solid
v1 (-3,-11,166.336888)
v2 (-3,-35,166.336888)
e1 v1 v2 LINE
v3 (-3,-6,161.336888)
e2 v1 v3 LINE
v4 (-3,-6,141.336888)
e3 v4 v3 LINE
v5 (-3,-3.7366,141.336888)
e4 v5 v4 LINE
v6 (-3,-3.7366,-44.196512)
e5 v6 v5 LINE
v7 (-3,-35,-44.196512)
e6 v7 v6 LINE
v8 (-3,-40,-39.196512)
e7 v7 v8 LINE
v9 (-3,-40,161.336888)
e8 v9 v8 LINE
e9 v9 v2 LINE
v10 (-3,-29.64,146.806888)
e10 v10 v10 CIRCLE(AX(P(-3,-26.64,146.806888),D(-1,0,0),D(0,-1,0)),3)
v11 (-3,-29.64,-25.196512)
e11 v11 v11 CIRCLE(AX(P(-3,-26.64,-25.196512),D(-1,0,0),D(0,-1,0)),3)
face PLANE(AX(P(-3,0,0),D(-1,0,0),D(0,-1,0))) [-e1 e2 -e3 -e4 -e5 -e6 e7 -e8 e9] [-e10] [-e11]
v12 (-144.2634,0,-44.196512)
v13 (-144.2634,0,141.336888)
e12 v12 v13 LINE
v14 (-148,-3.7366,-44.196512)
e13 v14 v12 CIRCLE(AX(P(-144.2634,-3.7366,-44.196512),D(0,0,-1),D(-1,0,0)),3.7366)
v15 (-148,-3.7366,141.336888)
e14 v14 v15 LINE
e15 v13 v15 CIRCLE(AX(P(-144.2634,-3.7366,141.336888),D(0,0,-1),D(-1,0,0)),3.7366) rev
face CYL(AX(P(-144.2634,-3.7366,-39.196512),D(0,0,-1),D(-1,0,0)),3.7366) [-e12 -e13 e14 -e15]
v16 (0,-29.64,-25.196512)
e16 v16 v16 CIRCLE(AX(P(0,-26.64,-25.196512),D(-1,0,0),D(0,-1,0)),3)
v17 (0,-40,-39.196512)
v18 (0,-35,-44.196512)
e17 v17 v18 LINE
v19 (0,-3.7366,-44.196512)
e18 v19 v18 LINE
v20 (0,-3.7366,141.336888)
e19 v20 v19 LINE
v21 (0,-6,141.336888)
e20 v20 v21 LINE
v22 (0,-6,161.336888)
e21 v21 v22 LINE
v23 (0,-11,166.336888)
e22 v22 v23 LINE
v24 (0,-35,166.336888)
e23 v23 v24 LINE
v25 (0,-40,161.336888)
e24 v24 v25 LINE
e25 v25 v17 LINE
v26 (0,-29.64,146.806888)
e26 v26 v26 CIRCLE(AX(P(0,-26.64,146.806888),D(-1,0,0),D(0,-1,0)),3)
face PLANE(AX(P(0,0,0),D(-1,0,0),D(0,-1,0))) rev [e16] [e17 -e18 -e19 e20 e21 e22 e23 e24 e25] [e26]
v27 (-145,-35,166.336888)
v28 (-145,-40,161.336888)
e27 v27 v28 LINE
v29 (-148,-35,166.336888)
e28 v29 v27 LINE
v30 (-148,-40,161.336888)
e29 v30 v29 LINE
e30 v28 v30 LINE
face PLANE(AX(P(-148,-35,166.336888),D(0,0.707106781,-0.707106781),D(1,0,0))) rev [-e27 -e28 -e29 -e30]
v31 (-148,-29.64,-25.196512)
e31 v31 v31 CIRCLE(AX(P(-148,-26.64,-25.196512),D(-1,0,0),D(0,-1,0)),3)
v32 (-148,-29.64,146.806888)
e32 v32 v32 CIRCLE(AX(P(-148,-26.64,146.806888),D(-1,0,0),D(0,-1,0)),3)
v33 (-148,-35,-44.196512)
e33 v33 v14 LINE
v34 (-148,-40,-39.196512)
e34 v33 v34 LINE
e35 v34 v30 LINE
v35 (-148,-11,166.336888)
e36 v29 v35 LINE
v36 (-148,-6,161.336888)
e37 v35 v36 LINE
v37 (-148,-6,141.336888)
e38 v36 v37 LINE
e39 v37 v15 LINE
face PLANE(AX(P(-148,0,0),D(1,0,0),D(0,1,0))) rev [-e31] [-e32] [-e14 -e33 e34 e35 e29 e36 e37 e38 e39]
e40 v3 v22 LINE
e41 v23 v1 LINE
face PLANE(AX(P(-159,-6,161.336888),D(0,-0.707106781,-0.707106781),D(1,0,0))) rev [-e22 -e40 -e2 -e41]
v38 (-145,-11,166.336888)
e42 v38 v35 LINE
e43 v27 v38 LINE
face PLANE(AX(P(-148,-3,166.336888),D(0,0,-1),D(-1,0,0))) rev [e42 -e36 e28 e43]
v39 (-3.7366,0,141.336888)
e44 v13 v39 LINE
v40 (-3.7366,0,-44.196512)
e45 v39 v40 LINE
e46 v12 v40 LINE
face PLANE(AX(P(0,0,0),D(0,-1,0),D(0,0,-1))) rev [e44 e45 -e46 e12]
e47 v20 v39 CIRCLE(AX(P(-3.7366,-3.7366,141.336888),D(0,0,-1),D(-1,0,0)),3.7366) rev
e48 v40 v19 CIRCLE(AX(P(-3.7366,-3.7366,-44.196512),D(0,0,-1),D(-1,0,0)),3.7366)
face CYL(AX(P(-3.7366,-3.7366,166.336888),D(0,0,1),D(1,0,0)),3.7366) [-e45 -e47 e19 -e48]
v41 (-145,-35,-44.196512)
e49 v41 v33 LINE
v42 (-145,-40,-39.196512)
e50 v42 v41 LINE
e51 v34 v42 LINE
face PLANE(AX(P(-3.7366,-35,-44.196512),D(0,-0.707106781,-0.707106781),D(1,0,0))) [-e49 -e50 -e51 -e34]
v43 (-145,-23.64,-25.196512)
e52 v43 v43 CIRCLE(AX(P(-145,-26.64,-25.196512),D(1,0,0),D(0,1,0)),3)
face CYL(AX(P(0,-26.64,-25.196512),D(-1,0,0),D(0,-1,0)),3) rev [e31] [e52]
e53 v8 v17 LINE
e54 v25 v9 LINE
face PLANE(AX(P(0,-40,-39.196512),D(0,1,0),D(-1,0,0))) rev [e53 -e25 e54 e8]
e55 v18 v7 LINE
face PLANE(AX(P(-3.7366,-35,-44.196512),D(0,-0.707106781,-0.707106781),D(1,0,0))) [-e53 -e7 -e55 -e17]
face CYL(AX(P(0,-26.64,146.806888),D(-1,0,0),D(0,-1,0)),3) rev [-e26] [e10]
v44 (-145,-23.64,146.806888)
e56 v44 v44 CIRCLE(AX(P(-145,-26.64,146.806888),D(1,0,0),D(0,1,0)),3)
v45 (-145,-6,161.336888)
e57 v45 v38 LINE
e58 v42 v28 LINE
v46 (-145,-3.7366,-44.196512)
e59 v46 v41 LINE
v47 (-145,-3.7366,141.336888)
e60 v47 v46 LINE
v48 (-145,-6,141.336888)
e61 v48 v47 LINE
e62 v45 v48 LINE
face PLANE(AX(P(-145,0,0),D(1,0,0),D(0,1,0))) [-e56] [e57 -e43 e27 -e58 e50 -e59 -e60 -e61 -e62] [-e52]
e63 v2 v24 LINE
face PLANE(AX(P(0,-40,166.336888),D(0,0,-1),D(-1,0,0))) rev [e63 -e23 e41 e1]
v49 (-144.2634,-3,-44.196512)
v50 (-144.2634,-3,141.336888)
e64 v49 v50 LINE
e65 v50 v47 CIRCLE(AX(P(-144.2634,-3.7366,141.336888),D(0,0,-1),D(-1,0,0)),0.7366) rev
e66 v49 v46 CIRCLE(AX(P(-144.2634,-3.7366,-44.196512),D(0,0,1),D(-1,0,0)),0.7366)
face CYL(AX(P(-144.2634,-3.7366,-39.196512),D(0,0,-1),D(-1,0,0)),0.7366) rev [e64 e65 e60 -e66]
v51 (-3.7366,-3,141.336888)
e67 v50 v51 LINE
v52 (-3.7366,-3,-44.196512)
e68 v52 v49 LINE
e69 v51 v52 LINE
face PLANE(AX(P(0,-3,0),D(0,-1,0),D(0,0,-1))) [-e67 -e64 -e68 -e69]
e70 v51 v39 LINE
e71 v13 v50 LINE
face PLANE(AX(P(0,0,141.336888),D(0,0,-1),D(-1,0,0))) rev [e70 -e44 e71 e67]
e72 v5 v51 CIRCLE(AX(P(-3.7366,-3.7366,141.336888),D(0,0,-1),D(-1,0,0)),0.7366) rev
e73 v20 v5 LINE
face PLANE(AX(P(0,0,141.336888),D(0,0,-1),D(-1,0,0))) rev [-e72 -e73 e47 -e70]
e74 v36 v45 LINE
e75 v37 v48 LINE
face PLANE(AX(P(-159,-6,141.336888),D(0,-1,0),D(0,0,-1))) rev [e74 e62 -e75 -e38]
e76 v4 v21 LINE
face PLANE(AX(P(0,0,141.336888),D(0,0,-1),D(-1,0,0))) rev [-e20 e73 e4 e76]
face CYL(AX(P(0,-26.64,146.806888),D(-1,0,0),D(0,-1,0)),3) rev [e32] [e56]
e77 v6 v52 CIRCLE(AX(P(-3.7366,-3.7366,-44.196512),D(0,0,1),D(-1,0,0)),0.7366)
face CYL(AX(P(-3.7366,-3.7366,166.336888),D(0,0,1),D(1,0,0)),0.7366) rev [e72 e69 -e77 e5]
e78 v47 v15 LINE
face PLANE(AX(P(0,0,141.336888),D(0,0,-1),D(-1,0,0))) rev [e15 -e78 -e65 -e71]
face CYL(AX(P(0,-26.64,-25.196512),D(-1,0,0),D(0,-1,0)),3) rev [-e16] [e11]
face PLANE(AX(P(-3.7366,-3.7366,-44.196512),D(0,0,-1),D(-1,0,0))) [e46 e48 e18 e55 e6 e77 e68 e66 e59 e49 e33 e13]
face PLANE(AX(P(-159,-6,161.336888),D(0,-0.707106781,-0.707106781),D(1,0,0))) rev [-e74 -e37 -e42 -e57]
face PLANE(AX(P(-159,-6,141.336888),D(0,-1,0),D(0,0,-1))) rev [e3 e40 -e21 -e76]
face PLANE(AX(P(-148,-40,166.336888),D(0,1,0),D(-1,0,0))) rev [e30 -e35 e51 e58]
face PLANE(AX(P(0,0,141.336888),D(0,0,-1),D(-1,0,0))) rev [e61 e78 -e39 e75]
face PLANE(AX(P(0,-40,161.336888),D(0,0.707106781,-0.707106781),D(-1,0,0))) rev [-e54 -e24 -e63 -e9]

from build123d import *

# Parameters (mm, degrees)
SKETCH18_W                     = 148
SKETCH18_H                     = 205.5334
BASE_FLANGE1_DEPTH             = 3
EDGE_FLANGE1_STRIP_W           = 13.4732
EDGE_FLANGE1_STRIP_H           = 3
EDGE_FLANGE1_STRIP_CUT_DEPTH   = 205.5334
EDGE_FLANGE1_STRIP_2_W         = 13.4732
EDGE_FLANGE1_STRIP_2_H         = 3
EDGE_FLANGE1_STRIP_CUT_2_DEPTH = 205.5334
EDGE_FLANGE1_DEPTH             = 205.5334
EDGE_FLANGE1_BEND_DEPTH        = 205.5334
SKETCH27_R                     = 3
CUT_EXTRUDE1_DEPTH             = 227.212201998
SKETCH28_W                     = 160
SKETCH28_H                     = 8
CUT_EXTRUDE2_DEPTH             = 25
BOSS_EXTRUDE1_DEPTH            = 5
CHAMFER2_SIZE                  = 5


# Sheet-metal steps are written as plain solids
with BuildPart() as part:
    # Sketch18 → Base-Flange1 (new body)
    with BuildSketch(Plane(origin=(0, 0, 0), x_dir=(1, 0, 0), z_dir=(0, 1, 0))):
        with Locations((-74, -63.57018807)):
            Rectangle(SKETCH18_W, SKETCH18_H)
    extrude(amount=-BASE_FLANGE1_DEPTH)

    # Edge-Flange1 strip (across the edge) → Edge-Flange1 strip cut (cut)
    with BuildSketch(Plane(origin=(0, -3, -39.19651193), x_dir=(-1, 0, 0), z_dir=(0, 0, 1))):
        with Locations((-3, -1.5)):
            Rectangle(EDGE_FLANGE1_STRIP_W, EDGE_FLANGE1_STRIP_H)
    extrude(amount=EDGE_FLANGE1_STRIP_CUT_DEPTH, mode=Mode.SUBTRACT)

    # Edge-Flange1 strip 2 (across the edge) → Edge-Flange1 strip cut 2 (cut)
    with BuildSketch(Plane(origin=(-148, -3, 166.33688807), x_dir=(1, 0, 0), z_dir=(0, 0, -1))):
        with Locations((-3, -1.5)):
            Rectangle(EDGE_FLANGE1_STRIP_2_W, EDGE_FLANGE1_STRIP_2_H)
    extrude(amount=EDGE_FLANGE1_STRIP_CUT_2_DEPTH, mode=Mode.SUBTRACT)

    # Edge-Flange1 section (across the edge) → Edge-Flange1 (add)
    with BuildSketch(Plane(origin=(0, -3, -39.19651193), x_dir=(-1, 0, 0), z_dir=(0, 0, 1))):
        with BuildLine():
            Line((0, 0.7366), (0, 37))
            Line((0, 37), (3, 37))
            Line((3, 37), (3, 0.7366))
            ThreePointArc((3, 0.7366), (3.215745145, 0.215745145), (3.7366, 0))
            Line((3.7366, 0), (3.7366, -3))
            ThreePointArc((3.7366, -3), (1.094424801, -1.905575199), (0, 0.7366))
        make_face()
    extrude(amount=EDGE_FLANGE1_DEPTH)

    # Edge-Flange1 section 2 (across the edge) → Edge-Flange1 bend (add)
    with BuildSketch(Plane(origin=(-148, -3, 166.33688807), x_dir=(1, 0, 0), z_dir=(0, 0, -1))):
        with BuildLine():
            Line((0, 0.7366), (0, 37))
            Line((0, 37), (3, 37))
            Line((3, 37), (3, 0.7366))
            ThreePointArc((3, 0.7366), (3.215745145, 0.215745145), (3.7366, 0))
            Line((3.7366, 0), (3.7366, -3))
            ThreePointArc((3.7366, -3), (1.094424801, -1.905575199), (0, 0.7366))
        make_face()
    extrude(amount=EDGE_FLANGE1_BEND_DEPTH)

    # Sketch27 → Cut-Extrude1 (cut, through all)
    with BuildSketch(Plane.ZY.offset(148)):
        with Locations(Location((-25.19651193, -26.64, 0), (0, 0, 270))):
            Circle(SKETCH27_R)
        with Locations(Location((146.80688807, -26.64, 0), (0, 0, 270))):
            Circle(SKETCH27_R)
    extrude(amount=-CUT_EXTRUDE1_DEPTH, mode=Mode.SUBTRACT)

    # Sketch28 → Cut-Extrude2 (cut)
    with BuildSketch(Plane.XY.offset(166.33688807)):
        with Locations((-79, -2)):
            Rectangle(SKETCH28_W, SKETCH28_H)
    extrude(amount=-CUT_EXTRUDE2_DEPTH, mode=Mode.SUBTRACT)

    # Sketch32 → Boss-Extrude1 (add)
    with BuildSketch(Plane(origin=(0, 0, -39.19651193), x_dir=(-1, 0, 0), z_dir=(0, 0, -1))):
        with BuildLine():
            Line((0, -3.7366), (0, -40))
            Line((0, -40), (3, -40))
            Line((3, -40), (3, -3.7366))
            ThreePointArc((3, -3.7366), (3.215745145, -3.215745145), (3.7366, -3))
            Line((3.7366, -3), (144.2634, -3))
            ThreePointArc((144.2634, -3), (144.784254855, -3.215745145), (145, -3.7366))
            Line((145, -3.7366), (145, -40))
            Line((145, -40), (148, -40))
            Line((148, -40), (148, -3.7366))
            ThreePointArc((148, -3.7366), (146.905575199, -1.094424801), (144.2634, 0))
            Line((144.2634, 0), (3.7366, 0))
            ThreePointArc((3.7366, 0), (1.094424801, -1.094424801), (0, -3.7366))
        make_face()
    extrude(amount=BOSS_EXTRUDE1_DEPTH)

    # Chamfer2
    chamfer2_edges = [part.edges().sort_by_distance(p)[0] for p in [
        (-1.5, -6, 166.33688807),
        (-146.5, -6, 166.33688807),
        (-146.5, -40, -44.19651193),
        (-1.5, -40, -44.19651193),
        (-1.5, -40, 166.33688807),
        (-146.5, -40, 166.33688807),
    ]]
    chamfer(chamfer2_edges, length=CHAMFER2_SIZE)


solid = part.part
